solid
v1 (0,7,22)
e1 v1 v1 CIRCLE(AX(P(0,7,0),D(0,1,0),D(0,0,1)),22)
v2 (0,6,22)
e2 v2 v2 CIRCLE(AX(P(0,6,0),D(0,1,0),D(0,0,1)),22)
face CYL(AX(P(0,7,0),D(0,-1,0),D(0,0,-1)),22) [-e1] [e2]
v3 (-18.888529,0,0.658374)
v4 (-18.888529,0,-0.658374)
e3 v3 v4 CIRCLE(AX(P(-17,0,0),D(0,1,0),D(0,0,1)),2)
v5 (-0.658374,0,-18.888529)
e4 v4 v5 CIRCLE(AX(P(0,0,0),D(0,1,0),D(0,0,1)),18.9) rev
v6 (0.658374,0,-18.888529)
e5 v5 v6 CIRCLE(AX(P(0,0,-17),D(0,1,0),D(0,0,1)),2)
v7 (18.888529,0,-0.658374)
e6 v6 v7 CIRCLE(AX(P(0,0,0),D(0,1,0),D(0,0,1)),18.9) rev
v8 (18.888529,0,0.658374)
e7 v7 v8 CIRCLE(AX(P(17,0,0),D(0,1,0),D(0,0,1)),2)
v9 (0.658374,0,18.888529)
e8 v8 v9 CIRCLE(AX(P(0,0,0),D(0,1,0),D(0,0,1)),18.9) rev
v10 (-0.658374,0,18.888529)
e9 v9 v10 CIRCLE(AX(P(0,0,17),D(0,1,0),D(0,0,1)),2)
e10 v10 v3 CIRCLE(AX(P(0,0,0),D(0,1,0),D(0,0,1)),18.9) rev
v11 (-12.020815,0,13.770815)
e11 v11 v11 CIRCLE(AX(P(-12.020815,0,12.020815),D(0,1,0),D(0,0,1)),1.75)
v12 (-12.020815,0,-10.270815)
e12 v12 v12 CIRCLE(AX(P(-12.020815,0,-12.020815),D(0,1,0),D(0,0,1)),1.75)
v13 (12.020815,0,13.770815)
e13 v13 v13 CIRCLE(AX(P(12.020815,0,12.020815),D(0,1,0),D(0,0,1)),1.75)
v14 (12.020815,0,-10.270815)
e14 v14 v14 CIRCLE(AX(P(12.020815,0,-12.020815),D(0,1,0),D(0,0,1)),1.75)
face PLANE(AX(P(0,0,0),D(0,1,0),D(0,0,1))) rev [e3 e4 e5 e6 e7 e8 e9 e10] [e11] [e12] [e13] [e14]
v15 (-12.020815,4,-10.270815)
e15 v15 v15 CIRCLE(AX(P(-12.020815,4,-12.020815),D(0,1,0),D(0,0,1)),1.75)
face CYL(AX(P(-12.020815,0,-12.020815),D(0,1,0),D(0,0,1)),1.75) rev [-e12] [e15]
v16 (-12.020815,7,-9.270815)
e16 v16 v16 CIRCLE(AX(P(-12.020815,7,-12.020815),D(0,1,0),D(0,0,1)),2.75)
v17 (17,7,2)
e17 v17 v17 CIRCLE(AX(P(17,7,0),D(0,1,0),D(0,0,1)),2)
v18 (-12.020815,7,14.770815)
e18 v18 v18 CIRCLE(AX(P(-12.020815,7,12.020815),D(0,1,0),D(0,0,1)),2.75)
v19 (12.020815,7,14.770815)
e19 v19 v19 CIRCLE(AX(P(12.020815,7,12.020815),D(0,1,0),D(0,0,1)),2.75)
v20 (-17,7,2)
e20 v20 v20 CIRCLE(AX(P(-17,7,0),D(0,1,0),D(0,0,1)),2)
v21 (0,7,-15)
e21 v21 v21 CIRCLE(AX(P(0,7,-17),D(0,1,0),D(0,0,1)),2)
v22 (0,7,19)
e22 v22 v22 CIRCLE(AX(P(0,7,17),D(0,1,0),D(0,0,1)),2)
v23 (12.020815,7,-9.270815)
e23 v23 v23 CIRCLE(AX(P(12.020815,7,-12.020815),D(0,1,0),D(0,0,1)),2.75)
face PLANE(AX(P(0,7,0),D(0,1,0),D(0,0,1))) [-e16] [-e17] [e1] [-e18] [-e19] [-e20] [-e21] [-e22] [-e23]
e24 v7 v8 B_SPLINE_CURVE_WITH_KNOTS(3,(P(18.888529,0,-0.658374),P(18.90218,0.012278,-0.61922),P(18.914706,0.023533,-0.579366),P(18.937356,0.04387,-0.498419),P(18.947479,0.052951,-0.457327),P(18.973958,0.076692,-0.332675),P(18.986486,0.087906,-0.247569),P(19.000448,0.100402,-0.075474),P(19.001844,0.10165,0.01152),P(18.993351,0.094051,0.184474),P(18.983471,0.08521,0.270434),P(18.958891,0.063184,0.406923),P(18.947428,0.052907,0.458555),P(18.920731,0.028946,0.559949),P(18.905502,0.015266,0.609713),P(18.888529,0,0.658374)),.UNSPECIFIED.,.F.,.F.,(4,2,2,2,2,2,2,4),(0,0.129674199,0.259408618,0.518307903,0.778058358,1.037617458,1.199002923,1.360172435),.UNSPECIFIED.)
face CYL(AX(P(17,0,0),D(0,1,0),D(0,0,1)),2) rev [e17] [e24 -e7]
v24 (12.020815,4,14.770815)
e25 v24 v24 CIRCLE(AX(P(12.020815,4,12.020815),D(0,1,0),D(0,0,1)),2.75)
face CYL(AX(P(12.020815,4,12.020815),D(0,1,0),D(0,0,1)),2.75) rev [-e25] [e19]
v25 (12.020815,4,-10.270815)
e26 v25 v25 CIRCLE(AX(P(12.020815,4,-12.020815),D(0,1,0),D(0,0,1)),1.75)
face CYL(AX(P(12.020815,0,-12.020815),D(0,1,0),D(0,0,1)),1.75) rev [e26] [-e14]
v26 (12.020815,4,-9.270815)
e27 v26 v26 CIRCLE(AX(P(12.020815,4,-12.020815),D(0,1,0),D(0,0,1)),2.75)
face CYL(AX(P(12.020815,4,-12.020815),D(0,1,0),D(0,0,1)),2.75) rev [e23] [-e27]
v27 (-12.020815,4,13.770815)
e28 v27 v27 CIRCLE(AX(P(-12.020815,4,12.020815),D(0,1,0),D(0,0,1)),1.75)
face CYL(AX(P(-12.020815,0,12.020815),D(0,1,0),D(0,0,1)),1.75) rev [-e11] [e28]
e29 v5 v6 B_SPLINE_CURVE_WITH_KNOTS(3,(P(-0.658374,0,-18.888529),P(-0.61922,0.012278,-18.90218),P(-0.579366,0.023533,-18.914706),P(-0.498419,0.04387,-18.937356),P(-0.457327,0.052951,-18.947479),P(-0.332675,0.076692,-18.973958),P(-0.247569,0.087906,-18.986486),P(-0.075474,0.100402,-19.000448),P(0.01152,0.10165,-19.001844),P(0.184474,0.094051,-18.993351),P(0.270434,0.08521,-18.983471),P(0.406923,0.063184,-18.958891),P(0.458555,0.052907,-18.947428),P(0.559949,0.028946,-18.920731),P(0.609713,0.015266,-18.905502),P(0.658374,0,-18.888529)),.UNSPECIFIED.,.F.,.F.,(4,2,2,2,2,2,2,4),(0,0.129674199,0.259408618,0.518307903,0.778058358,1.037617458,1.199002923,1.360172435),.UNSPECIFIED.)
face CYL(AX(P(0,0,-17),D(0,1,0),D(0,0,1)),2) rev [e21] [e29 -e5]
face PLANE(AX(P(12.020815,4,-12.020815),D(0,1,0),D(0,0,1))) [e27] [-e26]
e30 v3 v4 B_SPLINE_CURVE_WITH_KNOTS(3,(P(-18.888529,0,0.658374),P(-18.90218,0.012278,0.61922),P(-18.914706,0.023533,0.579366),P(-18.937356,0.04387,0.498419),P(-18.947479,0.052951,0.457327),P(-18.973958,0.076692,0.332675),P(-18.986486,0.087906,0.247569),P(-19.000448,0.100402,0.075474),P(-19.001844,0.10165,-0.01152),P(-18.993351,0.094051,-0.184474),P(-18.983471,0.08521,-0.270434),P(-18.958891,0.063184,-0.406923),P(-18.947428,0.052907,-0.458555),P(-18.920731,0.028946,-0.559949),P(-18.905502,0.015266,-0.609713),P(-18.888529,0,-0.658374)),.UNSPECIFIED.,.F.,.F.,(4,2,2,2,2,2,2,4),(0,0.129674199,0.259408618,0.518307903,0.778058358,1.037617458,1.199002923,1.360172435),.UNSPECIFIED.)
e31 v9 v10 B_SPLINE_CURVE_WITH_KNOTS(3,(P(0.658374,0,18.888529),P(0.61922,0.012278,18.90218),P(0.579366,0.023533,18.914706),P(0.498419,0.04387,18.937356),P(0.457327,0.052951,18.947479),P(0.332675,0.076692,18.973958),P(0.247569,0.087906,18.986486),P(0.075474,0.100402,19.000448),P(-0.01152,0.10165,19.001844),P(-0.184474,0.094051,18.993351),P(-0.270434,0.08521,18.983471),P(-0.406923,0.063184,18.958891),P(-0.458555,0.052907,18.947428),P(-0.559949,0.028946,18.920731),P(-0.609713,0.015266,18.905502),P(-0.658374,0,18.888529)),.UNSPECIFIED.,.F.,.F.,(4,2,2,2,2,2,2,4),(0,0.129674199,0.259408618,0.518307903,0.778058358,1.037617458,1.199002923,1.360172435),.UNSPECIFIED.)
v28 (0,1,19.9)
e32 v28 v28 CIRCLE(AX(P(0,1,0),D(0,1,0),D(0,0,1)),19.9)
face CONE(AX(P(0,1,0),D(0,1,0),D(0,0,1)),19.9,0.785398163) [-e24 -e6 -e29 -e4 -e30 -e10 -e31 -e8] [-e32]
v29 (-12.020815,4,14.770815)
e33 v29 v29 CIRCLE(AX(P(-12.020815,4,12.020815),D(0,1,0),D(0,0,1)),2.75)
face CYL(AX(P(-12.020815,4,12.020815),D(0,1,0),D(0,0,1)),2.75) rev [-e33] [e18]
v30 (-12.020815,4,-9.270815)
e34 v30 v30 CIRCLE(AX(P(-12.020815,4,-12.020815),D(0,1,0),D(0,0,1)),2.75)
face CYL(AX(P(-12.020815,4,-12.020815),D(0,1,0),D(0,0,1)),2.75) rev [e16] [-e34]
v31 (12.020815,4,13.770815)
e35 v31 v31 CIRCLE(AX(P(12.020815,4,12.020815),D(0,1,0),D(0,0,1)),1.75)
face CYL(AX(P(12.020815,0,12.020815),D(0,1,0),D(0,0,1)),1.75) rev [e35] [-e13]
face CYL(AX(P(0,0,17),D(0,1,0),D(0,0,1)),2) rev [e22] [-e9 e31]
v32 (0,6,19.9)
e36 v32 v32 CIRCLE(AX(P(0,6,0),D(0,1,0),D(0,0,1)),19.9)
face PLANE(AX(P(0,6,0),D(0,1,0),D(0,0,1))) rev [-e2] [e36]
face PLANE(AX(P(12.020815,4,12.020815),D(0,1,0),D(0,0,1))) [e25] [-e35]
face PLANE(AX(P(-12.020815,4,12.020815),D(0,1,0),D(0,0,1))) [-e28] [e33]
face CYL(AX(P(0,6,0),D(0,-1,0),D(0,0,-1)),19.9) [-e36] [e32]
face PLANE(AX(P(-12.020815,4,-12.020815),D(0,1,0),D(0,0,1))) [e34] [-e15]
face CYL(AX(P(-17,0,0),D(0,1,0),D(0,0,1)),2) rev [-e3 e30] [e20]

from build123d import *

# Parameters (mm, degrees)
SKETCH1_R           = 19.9
BOSS_EXTRUDE1_DEPTH = 6
SKETCH2_R           = 22
BOSS_EXTRUDE2_DEPTH = 1
SKETCH3_R           = 2
SKETCH3_R_2         = 1.75
CUT_EXTRUDE1_DEPTH  = 32.890437438
SKETCH5_R           = 2.75
SKETCH5_R_2         = 1.75
CUT_EXTRUDE2_DEPTH  = 3
CHAMFER1_SIZE       = 1


with BuildPart() as part:
    # Sketch1 → Boss-Extrude1 (new body)
    with BuildSketch(Plane(origin=(0, 0, 0), x_dir=(1, 0, 0), z_dir=(0, 1, 0))):
        with Locations(Location((0, 0, 0), (0, 0, 270))):
            Circle(SKETCH1_R)
    extrude(amount=BOSS_EXTRUDE1_DEPTH)

    # Sketch2 → Boss-Extrude2 (add)
    with BuildSketch(Plane(origin=(0, 6, 0), x_dir=(1, 0, 0), z_dir=(0, 1, 0))):
        with Locations(Location((0, 0, 0), (0, 0, 270))):
            Circle(SKETCH2_R)
    extrude(amount=BOSS_EXTRUDE2_DEPTH)

    # Sketch3 → Cut-Extrude1 (cut, through all)
    with BuildSketch(Plane(origin=(0, 7, 0), x_dir=(1, 0, 0), z_dir=(0, 1, 0))):
        with Locations(Location((0, 17, 0), (0, 0, 270))):
            Circle(SKETCH3_R)
        with Locations(Location((17, 0, 0), (0, 0, 270))):
            Circle(SKETCH3_R)
        with Locations(Location((0, -17, 0), (0, 0, 270))):
            Circle(SKETCH3_R)
        with Locations(Location((-17, 0, 0), (0, 0, 270))):
            Circle(SKETCH3_R)
        with Locations(Location((-12.02081528, 12.02081528, 0), (0, 0, 270))):
            Circle(SKETCH3_R_2)
        with Locations(Location((12.02081528, 12.02081528, 0), (0, 0, 270))):
            Circle(SKETCH3_R_2)
        with Locations(Location((12.02081528, -12.02081528, 0), (0, 0, 270))):
            Circle(SKETCH3_R_2)
        with Locations(Location((-12.02081528, -12.02081528, 0), (0, 0, 270))):
            Circle(SKETCH3_R_2)
    extrude(amount=-CUT_EXTRUDE1_DEPTH, mode=Mode.SUBTRACT)

    # Sketch5 → Cut-Extrude2 (cut)
    # profile 1 of 4: a face of its own
    with BuildSketch(Plane(origin=(0, 7, 0), x_dir=(1, 0, 0), z_dir=(0, 1, 0))):
        with Locations(Location((-12.02081528, 12.02081528, 0), (0, 0, 270))):
            Circle(SKETCH5_R)
        with Locations(Location((-12.02081528, 12.02081528, 0), (0, 0, 270))):
            Circle(SKETCH5_R_2, mode=Mode.SUBTRACT)
    # profile 2 of 4: a face of its own
    with BuildSketch(Plane(origin=(0, 7, 0), x_dir=(1, 0, 0), z_dir=(0, 1, 0))):
        with Locations(Location((12.02081528, 12.02081528, 0), (0, 0, 270))):
            Circle(SKETCH5_R)
        with Locations(Location((12.02081528, 12.02081528, 0), (0, 0, 270))):
            Circle(SKETCH5_R_2, mode=Mode.SUBTRACT)
    # profile 3 of 4: a face of its own
    with BuildSketch(Plane(origin=(0, 7, 0), x_dir=(1, 0, 0), z_dir=(0, 1, 0))):
        with Locations(Location((12.02081528, -12.02081528, 0), (0, 0, 270))):
            Circle(SKETCH5_R)
        with Locations(Location((12.02081528, -12.02081528, 0), (0, 0, 270))):
            Circle(SKETCH5_R_2, mode=Mode.SUBTRACT)
    # profile 4 of 4: a face of its own
    with BuildSketch(Plane(origin=(0, 7, 0), x_dir=(1, 0, 0), z_dir=(0, 1, 0))):
        with Locations(Location((-12.02081528, -12.02081528, 0), (0, 0, 270))):
            Circle(SKETCH5_R)
        with Locations(Location((-12.02081528, -12.02081528, 0), (0, 0, 270))):
            Circle(SKETCH5_R_2, mode=Mode.SUBTRACT)
    extrude(amount=-CUT_EXTRUDE2_DEPTH, mode=Mode.SUBTRACT)

    # Chamfer1
    # the kernel refuses this chamfer: 1 mm, written as the material it takes off along each edge
    with BuildSketch(Plane(origin=(0, 0, 0), x_dir=(0, 0, 1), z_dir=(-1, 0, 0))) as chamfer1_piece_1:
        Polygon((19.9, CHAMFER1_SIZE), (19.9 - CHAMFER1_SIZE, 0), (19.9, 0), align=None)
    revolve(axis=Axis((0, 0, 0), (0, 1, 0)), mode=Mode.SUBTRACT)


solid = part.part
